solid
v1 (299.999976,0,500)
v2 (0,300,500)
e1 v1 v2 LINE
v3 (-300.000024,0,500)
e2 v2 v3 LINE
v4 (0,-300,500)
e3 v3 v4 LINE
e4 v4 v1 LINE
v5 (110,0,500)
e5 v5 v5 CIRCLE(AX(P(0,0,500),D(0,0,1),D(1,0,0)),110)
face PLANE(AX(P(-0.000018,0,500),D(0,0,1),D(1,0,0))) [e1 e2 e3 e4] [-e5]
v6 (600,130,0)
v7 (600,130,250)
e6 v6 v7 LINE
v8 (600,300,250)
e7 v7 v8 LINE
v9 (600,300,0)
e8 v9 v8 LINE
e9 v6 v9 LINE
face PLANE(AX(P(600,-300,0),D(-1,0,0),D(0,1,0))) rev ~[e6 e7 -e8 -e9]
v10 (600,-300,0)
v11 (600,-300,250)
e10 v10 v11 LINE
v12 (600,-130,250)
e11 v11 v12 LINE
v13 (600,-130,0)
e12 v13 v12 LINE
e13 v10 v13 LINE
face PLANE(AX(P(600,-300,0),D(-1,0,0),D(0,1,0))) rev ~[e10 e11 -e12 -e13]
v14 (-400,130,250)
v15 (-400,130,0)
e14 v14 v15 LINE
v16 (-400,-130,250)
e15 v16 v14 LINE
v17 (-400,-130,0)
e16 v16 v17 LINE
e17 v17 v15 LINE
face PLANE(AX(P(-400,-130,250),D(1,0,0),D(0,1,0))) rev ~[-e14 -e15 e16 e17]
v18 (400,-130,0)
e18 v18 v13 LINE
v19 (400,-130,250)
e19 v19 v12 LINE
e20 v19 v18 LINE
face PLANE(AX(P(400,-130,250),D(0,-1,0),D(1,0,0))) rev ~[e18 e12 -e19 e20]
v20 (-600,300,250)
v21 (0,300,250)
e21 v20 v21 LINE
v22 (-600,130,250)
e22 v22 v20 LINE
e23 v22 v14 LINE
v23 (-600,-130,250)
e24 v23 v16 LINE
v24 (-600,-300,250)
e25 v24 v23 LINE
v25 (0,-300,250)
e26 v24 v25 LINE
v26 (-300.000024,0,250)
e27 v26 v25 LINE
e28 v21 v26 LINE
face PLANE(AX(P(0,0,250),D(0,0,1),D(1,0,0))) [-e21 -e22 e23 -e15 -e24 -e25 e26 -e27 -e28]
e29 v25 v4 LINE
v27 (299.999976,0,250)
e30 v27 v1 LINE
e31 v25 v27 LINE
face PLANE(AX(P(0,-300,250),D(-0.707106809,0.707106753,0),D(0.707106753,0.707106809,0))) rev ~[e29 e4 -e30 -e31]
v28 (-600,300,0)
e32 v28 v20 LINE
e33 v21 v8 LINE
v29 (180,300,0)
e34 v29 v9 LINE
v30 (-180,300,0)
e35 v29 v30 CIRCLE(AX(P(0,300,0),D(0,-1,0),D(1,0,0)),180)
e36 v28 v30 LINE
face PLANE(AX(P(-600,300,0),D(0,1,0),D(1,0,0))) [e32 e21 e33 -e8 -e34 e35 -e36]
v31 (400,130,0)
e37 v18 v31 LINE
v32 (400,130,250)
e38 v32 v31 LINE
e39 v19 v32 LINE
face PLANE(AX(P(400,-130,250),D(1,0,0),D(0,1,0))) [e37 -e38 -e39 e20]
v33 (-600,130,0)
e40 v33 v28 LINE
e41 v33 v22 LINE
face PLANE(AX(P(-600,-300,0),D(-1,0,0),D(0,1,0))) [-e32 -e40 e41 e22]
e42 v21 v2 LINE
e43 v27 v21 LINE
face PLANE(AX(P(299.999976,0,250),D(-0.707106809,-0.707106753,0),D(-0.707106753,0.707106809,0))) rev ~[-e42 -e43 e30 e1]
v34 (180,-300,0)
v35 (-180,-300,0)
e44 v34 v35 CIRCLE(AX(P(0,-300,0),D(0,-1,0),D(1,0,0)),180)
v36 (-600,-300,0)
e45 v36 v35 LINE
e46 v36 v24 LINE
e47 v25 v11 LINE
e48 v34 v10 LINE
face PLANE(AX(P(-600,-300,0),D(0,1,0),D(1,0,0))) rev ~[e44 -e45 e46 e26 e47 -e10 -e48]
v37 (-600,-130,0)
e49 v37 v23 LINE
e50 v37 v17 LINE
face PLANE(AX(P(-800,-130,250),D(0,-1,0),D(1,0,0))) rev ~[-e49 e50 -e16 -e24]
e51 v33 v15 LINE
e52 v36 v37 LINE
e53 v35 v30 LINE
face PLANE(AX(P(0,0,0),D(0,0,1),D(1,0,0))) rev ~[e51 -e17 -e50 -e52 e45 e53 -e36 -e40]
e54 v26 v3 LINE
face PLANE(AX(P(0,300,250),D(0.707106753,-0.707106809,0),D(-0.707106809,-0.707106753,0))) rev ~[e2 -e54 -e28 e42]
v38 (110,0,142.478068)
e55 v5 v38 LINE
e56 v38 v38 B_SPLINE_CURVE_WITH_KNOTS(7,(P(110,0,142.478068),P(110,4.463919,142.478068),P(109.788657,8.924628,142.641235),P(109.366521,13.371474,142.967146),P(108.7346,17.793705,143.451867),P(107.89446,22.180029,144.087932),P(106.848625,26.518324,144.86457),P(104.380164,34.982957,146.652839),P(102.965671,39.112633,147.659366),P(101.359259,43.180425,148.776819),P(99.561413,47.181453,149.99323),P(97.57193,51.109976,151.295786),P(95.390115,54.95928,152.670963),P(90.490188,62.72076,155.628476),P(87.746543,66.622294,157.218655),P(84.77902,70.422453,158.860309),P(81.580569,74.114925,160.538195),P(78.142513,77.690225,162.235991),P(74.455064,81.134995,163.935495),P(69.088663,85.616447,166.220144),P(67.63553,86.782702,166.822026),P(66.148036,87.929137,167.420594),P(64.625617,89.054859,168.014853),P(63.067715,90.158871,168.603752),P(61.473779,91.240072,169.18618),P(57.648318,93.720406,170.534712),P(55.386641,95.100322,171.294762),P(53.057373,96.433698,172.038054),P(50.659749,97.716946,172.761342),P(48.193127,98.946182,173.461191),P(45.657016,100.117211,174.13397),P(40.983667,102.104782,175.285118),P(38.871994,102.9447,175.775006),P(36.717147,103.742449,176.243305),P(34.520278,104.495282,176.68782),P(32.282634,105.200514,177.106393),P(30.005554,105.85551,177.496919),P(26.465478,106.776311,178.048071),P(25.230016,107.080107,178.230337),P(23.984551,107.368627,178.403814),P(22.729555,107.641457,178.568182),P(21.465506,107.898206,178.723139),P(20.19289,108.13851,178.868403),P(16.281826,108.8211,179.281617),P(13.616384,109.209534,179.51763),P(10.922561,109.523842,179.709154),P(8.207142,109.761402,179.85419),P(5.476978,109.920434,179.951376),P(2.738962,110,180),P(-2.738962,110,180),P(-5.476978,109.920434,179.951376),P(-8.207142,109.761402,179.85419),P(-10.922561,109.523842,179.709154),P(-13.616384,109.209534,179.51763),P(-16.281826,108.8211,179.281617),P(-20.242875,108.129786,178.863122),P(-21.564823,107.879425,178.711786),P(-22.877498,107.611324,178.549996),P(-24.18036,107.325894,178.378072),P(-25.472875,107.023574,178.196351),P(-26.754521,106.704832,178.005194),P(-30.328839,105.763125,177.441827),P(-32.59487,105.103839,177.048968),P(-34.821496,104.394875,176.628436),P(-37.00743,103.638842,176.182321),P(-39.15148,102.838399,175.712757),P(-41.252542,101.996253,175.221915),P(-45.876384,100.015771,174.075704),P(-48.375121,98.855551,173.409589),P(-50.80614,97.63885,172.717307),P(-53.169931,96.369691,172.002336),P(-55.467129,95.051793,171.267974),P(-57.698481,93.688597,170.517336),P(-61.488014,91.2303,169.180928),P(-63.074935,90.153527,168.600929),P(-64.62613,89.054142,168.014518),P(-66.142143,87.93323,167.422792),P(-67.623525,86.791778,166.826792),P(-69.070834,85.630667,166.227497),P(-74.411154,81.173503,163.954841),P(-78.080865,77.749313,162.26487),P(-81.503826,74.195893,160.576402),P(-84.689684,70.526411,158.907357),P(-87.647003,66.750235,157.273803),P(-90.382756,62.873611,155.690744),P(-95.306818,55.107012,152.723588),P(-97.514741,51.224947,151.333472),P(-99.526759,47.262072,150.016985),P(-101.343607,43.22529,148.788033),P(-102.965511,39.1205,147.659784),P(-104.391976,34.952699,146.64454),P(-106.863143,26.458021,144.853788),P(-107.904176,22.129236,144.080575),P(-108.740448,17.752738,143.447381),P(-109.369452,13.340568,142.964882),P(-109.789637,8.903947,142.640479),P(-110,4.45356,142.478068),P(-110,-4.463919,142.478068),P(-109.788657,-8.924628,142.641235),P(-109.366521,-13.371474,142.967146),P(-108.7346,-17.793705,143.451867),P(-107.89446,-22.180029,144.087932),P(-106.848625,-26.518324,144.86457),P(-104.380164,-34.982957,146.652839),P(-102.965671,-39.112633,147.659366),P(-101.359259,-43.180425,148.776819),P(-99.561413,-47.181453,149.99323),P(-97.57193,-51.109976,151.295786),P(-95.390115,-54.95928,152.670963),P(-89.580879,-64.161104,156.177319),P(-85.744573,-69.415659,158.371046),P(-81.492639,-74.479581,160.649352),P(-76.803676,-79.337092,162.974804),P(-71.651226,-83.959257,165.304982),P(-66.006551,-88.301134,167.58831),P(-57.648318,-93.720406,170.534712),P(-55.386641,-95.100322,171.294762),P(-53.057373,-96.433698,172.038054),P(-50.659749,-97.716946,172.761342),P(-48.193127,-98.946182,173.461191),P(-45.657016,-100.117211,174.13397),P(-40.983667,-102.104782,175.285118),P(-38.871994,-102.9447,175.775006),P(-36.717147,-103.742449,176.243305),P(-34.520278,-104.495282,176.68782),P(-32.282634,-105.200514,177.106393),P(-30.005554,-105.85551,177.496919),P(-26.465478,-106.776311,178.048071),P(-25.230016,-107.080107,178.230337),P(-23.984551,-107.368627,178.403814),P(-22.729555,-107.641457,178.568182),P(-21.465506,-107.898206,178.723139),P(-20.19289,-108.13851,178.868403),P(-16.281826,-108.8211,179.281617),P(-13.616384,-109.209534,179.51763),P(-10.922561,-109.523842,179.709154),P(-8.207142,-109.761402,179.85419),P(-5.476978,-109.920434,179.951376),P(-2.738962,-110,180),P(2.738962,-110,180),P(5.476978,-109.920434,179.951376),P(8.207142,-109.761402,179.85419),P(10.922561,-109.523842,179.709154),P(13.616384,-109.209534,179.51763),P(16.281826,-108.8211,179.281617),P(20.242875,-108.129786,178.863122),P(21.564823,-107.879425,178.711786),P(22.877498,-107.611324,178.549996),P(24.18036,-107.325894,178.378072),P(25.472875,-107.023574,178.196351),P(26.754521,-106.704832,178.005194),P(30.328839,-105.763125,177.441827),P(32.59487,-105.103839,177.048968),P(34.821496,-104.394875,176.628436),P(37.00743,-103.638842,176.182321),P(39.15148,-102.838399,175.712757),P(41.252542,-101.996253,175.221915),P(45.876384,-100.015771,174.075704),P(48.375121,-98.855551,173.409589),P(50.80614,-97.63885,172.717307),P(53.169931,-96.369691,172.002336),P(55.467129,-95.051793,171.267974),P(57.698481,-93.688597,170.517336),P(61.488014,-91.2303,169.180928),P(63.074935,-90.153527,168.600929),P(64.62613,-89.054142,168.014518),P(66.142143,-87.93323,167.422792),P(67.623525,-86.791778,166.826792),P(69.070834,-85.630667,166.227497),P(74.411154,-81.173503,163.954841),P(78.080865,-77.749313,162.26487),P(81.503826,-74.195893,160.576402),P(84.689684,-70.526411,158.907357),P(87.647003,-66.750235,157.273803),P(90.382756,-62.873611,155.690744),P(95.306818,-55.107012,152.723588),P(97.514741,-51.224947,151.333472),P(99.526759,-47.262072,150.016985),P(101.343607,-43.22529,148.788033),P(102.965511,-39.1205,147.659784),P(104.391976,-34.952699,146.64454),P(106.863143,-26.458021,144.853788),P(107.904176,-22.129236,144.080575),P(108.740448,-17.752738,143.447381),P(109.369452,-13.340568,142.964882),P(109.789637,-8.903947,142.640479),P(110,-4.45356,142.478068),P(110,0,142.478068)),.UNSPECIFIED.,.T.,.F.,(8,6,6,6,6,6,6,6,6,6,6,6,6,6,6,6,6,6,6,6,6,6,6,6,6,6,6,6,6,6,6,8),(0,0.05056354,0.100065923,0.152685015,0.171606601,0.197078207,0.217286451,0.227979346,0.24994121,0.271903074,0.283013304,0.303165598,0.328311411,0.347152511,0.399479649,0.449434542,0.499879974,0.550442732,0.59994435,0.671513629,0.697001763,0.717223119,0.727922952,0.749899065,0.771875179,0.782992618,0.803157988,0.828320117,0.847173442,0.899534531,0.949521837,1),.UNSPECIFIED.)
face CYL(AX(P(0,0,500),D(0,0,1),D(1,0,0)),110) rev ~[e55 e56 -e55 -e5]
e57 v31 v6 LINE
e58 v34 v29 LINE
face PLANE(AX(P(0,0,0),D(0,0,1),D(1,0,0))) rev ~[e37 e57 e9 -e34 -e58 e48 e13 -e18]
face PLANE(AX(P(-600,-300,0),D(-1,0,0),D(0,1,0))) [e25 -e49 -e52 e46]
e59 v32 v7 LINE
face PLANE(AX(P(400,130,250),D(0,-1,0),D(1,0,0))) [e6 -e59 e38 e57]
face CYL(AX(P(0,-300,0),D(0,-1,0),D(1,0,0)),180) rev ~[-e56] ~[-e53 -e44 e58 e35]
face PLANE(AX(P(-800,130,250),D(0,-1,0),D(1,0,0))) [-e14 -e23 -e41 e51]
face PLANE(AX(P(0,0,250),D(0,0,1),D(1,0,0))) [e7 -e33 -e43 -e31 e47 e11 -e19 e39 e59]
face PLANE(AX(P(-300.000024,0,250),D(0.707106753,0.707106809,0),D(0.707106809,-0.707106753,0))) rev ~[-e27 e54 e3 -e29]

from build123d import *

# Parameters (mm, degrees)
F0_W     = 1200
F0_H     = 600
F1_DEPTH = 250
F2_W     = 400
F2_H     = 260
F3_DEPTH = 250.001
F5_DEPTH = 600.001
F7_DEPTH = 250
F8_R     = 110
F9_DEPTH = 500.001


# Not quite as in the source:
# - a feature names something its author has since deleted; it is built from what else it names


with BuildPart() as f1:
    # F0 (on Top) → F1 (new body)
    with BuildSketch(Plane.XY):
        Rectangle(F0_W, F0_H)
    extrude(amount=F1_DEPTH)

    # F2 (on face) → F3 (cut, through all)
    with BuildSketch(Plane.XY.offset(250)):
        with Locations((-600, 0)):
            Rectangle(F2_W, F2_H)
        with Locations((600, 0)):
            Rectangle(F2_W, F2_H)
    extrude(amount=-F3_DEPTH, mode=Mode.SUBTRACT)

    # F4 (on face) → F5 (cut, through all)
    with BuildSketch(Plane.XZ.offset(300)):
        with BuildLine():
            Line((-180, 0), (180, 0))
            ThreePointArc((180, 0), (0, 180), (-180, 0))
        make_face()
    extrude(amount=-F5_DEPTH, mode=Mode.SUBTRACT)

    # F6 (on face) → F7 (join)
    with BuildSketch(Plane.XY.offset(250)):
        Polygon((299.9999760684, 0), (0, 300), (-300.0000239316, 0), (0, -300), align=None)
    extrude(amount=F7_DEPTH)

    # F8 (on face) → F9 (cut, through all)
    with BuildSketch(Plane.XY.offset(500)):
        Circle(F8_R)
    extrude(amount=-F9_DEPTH, mode=Mode.SUBTRACT)


solid = f1.part
